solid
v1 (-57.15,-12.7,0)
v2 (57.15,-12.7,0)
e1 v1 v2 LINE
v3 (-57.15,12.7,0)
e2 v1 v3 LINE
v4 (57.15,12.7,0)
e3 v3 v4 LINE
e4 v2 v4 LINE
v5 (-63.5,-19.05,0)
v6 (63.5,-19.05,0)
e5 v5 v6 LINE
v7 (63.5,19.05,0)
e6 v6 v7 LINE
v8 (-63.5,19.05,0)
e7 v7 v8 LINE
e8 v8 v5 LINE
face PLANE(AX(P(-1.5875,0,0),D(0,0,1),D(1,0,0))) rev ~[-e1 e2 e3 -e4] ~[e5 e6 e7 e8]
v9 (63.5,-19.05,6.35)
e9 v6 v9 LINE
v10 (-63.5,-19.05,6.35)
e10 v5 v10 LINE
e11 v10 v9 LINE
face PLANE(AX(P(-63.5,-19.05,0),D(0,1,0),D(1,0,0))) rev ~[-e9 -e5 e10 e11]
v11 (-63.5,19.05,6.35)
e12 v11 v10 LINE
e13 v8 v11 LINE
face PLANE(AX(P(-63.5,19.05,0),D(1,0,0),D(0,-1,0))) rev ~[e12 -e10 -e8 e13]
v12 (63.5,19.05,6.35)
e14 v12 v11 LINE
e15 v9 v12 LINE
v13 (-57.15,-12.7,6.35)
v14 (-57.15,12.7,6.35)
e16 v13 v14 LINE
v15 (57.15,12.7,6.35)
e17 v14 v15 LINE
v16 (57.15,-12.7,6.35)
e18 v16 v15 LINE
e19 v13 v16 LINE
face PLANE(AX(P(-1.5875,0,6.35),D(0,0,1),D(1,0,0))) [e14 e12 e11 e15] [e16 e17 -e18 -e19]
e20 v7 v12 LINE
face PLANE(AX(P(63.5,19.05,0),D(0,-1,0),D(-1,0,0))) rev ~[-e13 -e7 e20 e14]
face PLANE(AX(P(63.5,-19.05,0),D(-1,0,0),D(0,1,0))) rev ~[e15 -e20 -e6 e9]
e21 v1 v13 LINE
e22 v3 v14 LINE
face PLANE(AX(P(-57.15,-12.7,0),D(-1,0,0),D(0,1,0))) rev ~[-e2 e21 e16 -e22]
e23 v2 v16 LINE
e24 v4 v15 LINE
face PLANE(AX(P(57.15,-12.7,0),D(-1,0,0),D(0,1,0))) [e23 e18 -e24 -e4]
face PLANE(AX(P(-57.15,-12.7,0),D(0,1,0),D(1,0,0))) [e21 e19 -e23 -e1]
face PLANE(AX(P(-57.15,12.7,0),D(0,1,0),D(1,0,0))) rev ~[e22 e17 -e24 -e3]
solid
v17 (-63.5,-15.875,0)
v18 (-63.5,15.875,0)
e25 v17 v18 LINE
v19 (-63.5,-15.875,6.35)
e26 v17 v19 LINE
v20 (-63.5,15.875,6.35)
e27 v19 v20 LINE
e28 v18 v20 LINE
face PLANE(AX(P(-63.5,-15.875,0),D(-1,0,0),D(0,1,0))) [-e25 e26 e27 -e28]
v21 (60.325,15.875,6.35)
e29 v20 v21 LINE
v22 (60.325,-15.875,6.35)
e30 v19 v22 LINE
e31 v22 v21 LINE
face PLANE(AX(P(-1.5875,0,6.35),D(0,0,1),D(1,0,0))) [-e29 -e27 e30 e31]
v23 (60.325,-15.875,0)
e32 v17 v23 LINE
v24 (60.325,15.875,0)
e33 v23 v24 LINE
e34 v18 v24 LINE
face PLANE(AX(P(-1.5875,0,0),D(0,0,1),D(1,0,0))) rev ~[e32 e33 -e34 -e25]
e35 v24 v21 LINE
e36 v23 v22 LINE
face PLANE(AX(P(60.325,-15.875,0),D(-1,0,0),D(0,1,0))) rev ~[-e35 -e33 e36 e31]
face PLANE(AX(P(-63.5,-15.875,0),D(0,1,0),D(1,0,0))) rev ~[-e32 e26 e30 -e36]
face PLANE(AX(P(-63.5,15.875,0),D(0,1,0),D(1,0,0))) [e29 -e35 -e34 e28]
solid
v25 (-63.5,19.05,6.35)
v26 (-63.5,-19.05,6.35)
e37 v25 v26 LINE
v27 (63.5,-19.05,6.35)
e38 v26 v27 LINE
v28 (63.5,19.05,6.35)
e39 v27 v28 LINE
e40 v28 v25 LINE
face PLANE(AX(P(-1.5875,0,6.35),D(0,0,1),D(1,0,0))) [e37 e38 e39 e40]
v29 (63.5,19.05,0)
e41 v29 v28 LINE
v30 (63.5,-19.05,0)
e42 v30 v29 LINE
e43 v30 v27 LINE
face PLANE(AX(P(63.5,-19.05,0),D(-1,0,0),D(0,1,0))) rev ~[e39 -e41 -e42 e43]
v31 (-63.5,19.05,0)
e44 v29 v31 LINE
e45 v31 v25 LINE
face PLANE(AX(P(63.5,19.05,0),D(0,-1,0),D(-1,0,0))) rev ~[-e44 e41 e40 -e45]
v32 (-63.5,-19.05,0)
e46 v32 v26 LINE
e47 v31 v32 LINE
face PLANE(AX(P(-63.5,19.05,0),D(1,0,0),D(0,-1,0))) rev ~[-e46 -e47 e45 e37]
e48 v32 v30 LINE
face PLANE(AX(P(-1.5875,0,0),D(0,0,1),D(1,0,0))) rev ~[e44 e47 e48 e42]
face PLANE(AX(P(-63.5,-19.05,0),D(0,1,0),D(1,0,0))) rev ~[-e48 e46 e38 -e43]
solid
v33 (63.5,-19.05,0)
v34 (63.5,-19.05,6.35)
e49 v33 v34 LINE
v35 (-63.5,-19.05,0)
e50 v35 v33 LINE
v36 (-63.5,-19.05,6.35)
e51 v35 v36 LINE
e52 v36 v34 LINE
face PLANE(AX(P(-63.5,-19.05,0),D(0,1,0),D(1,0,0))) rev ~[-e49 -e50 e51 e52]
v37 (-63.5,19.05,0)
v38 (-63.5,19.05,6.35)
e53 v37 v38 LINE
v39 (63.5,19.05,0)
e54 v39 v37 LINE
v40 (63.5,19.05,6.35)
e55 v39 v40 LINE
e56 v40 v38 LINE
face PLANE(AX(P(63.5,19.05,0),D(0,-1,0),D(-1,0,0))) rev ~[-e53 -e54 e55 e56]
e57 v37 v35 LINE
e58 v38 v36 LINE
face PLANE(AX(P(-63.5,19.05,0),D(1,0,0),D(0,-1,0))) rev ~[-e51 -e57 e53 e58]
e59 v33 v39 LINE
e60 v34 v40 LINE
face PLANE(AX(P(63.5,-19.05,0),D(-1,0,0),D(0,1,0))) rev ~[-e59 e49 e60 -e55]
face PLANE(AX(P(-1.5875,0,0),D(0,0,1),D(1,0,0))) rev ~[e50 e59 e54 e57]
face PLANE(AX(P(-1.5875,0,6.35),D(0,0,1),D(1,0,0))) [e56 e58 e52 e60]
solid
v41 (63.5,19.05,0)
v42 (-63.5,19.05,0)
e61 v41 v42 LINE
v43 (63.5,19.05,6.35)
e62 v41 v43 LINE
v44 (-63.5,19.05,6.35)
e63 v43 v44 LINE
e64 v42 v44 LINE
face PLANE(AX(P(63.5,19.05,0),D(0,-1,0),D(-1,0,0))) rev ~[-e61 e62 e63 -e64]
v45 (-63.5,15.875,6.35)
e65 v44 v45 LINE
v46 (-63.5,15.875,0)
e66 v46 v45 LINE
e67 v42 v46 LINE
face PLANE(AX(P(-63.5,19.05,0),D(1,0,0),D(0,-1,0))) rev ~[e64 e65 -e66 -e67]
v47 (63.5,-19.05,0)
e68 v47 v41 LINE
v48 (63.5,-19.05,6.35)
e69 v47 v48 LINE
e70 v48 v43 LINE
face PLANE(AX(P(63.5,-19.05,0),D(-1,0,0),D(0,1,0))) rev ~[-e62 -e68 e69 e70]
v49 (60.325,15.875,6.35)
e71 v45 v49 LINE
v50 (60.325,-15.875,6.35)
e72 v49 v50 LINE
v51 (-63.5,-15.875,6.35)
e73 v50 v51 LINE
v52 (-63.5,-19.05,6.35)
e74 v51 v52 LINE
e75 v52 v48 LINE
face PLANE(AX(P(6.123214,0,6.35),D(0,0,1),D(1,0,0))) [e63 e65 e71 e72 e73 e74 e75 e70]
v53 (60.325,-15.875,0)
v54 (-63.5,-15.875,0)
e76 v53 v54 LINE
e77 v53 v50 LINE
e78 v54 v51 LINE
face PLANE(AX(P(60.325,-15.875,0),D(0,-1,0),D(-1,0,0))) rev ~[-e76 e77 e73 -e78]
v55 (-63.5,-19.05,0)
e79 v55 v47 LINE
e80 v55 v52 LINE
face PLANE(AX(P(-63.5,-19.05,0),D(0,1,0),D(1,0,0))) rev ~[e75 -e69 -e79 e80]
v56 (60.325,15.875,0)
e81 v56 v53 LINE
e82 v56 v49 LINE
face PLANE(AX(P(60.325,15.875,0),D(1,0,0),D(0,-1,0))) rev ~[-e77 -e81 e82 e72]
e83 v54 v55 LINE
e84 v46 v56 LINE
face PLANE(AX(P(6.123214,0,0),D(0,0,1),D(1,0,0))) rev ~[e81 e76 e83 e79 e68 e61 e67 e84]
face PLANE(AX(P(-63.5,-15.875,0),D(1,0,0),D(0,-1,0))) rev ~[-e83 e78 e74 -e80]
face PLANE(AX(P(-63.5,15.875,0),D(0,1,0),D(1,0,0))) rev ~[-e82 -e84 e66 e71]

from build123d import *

# Parameters (mm, degrees)
F1_W     = 123.825
F1_H     = 31.75
F1_W_2   = 114.3
F1_H_2   = 25.4
F2_DEPTH = 6.35
F3_DEPTH = 6.35
F4_DEPTH = 6.35
F5_DEPTH = 6.35
F6_DEPTH = 6.35


# Not quite as in the source:
# - a variable given as a bare number and used for a length is read in inches; the dataset says mm whatever the document's units were


with BuildPart() as f2:
    # F1 (on Top) → F2 (new body)
    with BuildSketch(Plane.XY):
        with Locations((-1.5875, 0)):
            Rectangle(F1_W, F1_H)
        Rectangle(F1_W_2, F1_H_2, mode=Mode.SUBTRACT)
        Rectangle(F1_W_2, F1_H_2)
        Polygon((-63.5, -19.05), (63.5, -19.05), (63.5, 19.05), (-63.5, 19.05), (-63.5, 15.875), (60.325, 15.875), (60.325, -15.875), (-63.5, -15.875), align=None)
    extrude(amount=F2_DEPTH)


with BuildPart() as f3:
    # F1 (on Top) → F3 (new body)
    with BuildSketch(Plane.XY):
        with Locations((-1.5875, 0)):
            Rectangle(F1_W, F1_H)
        Rectangle(F1_W_2, F1_H_2, mode=Mode.SUBTRACT)
        Polygon((-63.5, -19.05), (63.5, -19.05), (63.5, 19.05), (-63.5, 19.05), (-63.5, 15.875), (60.325, 15.875), (60.325, -15.875), (-63.5, -15.875), align=None)
    extrude(amount=F3_DEPTH)


with BuildPart() as f4:
    # F1 (on Top) → F4 (new body)
    with BuildSketch(Plane.XY):
        Polygon((-63.5, -19.05), (63.5, -19.05), (63.5, 19.05), (-63.5, 19.05), (-63.5, 15.875), (60.325, 15.875), (60.325, -15.875), (-63.5, -15.875), align=None)
    extrude(amount=F4_DEPTH)


with BuildPart() as f5:
    # F1 (on Top) → F5 (new body)
    with BuildSketch(Plane.XY):
        with Locations((-1.5875, 0)):
            Rectangle(F1_W, F1_H)
        Rectangle(F1_W_2, F1_H_2, mode=Mode.SUBTRACT)
        Rectangle(F1_W_2, F1_H_2)
    extrude(amount=F5_DEPTH)


with BuildPart() as f6:
    # F1 (on Top) → F6 (new body)
    with BuildSketch(Plane.XY):
        with Locations((-1.5875, 0)):
            Rectangle(F1_W, F1_H)
        Rectangle(F1_W_2, F1_H_2, mode=Mode.SUBTRACT)
        Rectangle(F1_W_2, F1_H_2)
        Polygon((-63.5, -19.05), (63.5, -19.05), (63.5, 19.05), (-63.5, 19.05), (-63.5, 15.875), (60.325, 15.875), (60.325, -15.875), (-63.5, -15.875), align=None)
    extrude(amount=F6_DEPTH)


solid = Compound([f2.part, f3.part, f4.part, f5.part, f6.part])
